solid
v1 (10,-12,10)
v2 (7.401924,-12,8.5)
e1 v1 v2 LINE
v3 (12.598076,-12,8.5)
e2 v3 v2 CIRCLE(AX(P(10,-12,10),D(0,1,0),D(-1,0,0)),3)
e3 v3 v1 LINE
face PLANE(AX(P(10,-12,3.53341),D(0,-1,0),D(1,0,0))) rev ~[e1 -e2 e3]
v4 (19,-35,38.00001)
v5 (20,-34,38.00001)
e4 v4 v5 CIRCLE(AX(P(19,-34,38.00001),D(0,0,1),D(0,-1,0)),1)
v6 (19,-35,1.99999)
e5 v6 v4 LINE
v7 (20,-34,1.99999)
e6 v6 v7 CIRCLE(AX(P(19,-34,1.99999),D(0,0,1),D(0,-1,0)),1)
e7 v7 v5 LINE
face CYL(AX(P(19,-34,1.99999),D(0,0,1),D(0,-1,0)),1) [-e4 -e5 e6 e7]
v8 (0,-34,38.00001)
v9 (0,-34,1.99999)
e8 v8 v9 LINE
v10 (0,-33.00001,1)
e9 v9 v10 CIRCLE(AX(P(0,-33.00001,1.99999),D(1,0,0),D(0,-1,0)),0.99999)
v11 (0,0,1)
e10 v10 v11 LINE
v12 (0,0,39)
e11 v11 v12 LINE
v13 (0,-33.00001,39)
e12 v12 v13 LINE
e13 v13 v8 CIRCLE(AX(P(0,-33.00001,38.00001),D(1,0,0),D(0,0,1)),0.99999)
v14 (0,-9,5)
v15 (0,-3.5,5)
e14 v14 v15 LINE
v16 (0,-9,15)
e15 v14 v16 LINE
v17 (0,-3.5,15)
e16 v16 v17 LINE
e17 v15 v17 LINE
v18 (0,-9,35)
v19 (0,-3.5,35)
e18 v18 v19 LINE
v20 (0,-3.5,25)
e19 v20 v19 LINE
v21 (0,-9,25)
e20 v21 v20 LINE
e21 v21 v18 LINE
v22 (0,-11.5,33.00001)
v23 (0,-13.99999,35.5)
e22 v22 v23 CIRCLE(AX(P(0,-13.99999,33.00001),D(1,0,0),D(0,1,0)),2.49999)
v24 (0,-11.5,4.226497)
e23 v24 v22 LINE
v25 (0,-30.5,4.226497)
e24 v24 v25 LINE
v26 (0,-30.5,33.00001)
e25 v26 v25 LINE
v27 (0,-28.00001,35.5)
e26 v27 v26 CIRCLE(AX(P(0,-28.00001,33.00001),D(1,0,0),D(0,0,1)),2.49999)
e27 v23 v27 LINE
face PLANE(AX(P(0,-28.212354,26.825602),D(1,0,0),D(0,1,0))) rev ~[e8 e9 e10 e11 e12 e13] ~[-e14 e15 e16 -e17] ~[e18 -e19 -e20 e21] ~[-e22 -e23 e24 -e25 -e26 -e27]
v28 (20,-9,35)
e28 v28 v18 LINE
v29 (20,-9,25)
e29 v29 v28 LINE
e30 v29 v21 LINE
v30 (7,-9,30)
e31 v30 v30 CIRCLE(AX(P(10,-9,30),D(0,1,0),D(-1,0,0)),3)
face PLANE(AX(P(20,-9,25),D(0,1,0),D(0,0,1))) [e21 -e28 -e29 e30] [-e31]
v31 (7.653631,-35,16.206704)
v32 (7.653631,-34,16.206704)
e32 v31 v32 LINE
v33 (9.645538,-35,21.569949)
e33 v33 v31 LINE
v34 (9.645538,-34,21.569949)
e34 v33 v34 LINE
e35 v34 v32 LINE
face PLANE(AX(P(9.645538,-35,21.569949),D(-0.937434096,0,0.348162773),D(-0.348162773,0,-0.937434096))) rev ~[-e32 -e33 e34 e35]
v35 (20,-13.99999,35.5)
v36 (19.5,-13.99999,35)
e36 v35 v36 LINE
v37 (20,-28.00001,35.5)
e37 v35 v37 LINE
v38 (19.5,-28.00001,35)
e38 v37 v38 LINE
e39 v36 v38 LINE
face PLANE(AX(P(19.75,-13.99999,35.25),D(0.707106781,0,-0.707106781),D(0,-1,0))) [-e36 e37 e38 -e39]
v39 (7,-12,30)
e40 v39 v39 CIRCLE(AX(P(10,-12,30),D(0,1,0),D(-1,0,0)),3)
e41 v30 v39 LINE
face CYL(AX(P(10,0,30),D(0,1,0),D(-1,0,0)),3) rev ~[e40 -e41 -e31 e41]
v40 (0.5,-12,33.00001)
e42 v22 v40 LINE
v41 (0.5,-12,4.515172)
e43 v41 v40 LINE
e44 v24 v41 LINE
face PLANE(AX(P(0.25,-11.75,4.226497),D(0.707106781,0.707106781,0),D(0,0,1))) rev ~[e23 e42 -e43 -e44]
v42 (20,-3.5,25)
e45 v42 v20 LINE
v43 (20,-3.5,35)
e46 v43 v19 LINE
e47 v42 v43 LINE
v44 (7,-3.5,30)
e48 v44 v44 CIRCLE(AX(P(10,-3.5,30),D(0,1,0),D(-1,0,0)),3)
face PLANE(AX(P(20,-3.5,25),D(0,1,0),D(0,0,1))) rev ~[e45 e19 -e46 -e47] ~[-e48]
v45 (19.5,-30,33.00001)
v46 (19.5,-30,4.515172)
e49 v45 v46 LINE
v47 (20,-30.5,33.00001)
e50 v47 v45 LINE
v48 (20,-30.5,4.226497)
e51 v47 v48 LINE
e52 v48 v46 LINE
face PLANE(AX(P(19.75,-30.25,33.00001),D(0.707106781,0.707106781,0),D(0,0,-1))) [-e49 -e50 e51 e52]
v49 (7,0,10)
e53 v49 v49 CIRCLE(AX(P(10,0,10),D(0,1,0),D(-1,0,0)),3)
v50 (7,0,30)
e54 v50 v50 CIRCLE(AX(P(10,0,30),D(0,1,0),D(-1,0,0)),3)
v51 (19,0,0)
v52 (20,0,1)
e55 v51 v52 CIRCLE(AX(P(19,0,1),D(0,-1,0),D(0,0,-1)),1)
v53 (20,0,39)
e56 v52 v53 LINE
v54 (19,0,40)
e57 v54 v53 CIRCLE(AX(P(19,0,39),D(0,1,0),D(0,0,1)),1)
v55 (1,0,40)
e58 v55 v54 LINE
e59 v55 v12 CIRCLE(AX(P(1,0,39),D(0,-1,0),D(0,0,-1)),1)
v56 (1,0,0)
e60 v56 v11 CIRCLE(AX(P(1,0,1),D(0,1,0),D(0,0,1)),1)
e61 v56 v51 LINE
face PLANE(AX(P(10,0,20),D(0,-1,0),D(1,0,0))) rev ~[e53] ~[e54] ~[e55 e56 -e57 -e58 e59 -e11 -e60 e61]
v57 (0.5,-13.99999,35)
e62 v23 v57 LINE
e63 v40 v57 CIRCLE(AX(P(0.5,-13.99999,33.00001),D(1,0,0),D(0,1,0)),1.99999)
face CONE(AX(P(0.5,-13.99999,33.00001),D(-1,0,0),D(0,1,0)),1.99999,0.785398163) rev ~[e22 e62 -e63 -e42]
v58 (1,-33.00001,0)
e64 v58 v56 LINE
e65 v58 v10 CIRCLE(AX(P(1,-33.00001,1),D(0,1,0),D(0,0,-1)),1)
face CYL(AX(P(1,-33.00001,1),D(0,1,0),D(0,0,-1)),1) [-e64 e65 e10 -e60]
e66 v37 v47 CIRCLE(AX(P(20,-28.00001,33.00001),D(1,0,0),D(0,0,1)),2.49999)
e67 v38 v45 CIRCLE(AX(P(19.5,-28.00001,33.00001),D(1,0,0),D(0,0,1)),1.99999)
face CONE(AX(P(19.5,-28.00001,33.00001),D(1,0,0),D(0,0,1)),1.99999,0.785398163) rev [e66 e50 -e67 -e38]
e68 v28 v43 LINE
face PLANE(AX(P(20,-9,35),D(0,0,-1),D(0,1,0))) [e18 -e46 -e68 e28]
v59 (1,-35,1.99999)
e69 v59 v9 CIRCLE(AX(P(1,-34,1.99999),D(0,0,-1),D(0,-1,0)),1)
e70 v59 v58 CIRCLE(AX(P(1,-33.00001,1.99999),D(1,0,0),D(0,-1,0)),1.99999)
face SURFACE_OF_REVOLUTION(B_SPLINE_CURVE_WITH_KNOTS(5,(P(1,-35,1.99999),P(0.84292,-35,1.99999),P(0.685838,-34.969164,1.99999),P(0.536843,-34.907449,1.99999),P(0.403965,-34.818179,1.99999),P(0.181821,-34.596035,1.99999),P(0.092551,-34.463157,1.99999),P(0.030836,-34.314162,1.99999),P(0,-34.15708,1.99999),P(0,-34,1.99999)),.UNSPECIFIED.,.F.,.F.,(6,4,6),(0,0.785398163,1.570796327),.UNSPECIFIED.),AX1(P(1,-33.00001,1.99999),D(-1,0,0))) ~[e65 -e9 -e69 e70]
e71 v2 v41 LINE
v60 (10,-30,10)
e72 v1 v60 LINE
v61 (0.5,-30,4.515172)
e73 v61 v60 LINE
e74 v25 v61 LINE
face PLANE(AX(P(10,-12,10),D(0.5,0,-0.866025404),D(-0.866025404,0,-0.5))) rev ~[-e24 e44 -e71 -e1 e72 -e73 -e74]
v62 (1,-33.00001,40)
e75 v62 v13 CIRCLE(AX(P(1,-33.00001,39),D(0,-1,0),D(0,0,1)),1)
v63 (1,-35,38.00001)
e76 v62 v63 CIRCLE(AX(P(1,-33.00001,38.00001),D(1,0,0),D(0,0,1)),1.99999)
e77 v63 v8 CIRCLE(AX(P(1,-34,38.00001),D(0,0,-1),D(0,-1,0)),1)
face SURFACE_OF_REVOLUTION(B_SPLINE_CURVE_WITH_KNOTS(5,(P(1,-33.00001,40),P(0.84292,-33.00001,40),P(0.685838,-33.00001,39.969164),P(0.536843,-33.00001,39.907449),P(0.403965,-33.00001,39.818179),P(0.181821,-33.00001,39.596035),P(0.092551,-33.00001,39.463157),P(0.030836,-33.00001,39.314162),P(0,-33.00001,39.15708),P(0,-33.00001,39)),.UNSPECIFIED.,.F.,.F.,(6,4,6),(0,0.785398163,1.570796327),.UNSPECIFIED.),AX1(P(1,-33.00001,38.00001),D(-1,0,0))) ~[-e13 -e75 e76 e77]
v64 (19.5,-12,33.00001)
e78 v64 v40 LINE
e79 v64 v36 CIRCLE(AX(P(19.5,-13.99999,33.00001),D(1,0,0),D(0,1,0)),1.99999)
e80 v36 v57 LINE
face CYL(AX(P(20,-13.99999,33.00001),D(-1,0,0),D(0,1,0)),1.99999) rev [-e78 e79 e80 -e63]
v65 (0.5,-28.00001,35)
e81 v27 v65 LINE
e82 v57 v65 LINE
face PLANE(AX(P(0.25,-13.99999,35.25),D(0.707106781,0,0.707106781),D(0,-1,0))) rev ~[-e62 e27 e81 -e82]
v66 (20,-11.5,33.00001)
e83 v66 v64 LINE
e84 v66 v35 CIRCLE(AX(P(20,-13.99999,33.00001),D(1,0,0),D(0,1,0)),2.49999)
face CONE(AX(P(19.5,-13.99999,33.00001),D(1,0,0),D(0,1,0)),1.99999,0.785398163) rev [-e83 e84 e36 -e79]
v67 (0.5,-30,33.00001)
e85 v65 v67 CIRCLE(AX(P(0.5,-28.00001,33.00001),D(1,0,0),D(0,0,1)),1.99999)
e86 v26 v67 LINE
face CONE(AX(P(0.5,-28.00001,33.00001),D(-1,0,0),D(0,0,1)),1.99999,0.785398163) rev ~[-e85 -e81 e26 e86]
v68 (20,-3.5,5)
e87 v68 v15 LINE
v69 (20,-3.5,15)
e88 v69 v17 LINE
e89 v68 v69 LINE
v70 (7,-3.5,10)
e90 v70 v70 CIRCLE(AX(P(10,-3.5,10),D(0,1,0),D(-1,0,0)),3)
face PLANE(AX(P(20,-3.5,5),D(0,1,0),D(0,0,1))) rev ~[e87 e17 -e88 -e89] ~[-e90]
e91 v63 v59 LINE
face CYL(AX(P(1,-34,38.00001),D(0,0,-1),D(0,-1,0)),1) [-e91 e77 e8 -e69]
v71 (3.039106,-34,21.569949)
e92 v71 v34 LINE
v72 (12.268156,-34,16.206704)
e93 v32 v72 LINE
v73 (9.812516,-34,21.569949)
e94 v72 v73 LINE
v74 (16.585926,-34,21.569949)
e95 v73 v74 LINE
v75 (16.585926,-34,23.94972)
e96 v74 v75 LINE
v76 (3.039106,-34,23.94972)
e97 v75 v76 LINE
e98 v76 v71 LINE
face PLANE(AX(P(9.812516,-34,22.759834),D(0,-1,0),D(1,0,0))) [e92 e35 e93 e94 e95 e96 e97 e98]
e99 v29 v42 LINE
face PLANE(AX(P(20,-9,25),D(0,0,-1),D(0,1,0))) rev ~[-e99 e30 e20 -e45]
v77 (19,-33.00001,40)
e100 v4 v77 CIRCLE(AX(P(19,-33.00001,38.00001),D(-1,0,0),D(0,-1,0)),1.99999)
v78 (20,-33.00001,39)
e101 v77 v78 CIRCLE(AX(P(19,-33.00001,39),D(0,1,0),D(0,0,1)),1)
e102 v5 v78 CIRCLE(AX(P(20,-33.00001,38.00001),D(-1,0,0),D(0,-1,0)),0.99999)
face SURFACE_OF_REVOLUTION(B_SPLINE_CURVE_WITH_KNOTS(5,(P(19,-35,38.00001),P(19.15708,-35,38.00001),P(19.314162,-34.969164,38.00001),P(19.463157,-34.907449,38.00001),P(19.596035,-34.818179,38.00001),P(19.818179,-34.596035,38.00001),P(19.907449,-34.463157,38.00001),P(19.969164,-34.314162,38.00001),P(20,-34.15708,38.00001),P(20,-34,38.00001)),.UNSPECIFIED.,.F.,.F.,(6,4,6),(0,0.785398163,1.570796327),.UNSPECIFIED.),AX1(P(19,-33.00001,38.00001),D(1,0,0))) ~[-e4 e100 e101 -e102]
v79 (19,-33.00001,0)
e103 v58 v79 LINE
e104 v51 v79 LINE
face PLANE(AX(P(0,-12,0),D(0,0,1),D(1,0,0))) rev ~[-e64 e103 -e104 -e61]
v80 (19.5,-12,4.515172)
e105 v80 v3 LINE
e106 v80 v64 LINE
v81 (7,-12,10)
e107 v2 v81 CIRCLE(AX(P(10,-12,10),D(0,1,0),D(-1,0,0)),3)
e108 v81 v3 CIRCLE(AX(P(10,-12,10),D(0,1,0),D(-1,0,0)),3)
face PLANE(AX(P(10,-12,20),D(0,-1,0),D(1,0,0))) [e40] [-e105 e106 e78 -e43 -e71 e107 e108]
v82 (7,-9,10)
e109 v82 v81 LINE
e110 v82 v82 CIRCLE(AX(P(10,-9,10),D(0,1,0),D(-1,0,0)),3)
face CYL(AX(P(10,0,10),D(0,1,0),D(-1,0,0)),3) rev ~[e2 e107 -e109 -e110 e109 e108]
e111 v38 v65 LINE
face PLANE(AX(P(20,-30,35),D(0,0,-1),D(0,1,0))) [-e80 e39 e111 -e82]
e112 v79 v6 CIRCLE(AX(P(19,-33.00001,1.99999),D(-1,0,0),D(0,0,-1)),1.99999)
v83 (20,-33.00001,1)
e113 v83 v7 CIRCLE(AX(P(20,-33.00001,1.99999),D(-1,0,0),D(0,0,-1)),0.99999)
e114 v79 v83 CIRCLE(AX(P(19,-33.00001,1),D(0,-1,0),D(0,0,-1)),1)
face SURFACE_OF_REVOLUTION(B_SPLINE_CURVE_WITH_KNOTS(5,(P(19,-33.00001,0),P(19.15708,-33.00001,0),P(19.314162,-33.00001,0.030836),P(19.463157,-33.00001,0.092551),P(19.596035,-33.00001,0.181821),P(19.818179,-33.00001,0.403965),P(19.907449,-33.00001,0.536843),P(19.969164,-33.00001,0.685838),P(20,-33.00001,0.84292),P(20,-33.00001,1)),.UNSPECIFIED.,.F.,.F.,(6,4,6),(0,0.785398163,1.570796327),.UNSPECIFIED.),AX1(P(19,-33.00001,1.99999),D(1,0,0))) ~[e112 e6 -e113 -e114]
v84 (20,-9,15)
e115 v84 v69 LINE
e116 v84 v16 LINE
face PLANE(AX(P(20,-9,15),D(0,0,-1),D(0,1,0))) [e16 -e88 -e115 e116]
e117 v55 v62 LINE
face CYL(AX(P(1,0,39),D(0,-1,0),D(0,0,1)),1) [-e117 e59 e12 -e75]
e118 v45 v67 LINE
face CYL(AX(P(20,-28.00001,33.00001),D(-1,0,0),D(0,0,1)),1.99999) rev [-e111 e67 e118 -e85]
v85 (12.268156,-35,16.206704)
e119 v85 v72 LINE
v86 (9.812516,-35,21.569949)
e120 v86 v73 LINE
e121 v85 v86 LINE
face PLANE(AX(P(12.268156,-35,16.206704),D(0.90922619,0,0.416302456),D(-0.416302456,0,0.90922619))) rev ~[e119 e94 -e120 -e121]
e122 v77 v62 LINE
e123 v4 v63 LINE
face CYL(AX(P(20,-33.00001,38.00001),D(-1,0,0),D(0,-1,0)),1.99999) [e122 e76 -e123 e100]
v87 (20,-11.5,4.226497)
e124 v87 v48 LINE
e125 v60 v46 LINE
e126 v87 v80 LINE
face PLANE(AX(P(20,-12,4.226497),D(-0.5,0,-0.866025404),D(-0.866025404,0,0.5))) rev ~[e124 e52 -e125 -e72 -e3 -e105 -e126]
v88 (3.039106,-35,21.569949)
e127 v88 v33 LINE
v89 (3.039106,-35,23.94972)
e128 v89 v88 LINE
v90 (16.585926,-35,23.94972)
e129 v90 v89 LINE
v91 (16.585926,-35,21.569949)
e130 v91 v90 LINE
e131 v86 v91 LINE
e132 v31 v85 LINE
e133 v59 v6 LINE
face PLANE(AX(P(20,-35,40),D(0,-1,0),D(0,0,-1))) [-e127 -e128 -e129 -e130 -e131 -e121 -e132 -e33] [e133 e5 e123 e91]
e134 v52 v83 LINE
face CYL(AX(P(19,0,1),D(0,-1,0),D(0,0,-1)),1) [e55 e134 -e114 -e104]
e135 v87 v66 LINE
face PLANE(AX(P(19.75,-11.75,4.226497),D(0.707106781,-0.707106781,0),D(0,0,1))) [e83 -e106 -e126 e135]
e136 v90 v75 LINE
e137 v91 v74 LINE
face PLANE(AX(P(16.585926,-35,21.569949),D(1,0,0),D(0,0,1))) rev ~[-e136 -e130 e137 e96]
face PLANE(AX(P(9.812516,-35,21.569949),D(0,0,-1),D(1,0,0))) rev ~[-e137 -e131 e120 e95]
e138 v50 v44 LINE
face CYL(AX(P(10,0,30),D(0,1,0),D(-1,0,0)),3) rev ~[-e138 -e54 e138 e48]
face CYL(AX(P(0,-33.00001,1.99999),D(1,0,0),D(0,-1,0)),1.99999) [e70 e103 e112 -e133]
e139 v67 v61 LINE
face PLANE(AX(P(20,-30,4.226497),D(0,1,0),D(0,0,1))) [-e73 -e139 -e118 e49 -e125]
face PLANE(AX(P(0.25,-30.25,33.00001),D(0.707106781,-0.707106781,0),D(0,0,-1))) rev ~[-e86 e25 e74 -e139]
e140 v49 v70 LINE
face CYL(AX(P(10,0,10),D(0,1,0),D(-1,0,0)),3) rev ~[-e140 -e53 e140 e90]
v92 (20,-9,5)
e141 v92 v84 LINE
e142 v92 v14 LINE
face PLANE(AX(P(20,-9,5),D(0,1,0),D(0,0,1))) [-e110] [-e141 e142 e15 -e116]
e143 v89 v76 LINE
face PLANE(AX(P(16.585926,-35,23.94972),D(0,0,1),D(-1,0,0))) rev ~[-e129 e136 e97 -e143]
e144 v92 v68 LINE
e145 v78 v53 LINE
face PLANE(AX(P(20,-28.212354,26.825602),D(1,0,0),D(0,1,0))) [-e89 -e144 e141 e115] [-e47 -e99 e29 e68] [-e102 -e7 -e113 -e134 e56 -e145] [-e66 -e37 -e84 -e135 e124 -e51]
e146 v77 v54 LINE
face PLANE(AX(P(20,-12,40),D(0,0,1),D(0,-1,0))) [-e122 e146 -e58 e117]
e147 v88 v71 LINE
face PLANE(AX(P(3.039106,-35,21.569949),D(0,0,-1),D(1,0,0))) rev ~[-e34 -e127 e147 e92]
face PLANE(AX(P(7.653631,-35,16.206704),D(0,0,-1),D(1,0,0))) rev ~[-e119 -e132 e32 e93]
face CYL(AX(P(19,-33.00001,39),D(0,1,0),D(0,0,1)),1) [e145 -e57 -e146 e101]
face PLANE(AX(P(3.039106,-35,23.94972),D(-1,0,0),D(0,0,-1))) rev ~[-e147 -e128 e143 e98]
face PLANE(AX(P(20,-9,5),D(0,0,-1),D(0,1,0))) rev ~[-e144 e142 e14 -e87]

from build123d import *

# Parameters (mm, degrees)
F0_W      = 20
F0_H      = 40
F1_DEPTH  = 12
F2_R      = 3
F3_DEPTH  = 12
F5_DEPTH  = 23
F7_DEPTH  = 20
F8_R      = 1.99999
F9_R      = 1
F10_W     = 5.5
F10_H     = 10
F11_DEPTH = 25
F13_DEPTH = 1
F14_SIZE  = 0.5


# Not quite as in the source:
# - a fillet or chamfer is up to 0.001 mm smaller than in the source, because OpenCascade refuses the exact size


with BuildPart() as f1:
    # F0 (on Front) → F1 (new body)
    with BuildSketch(Plane.XZ):
        with Locations((10, 20)):
            Rectangle(F0_W, F0_H)
    extrude(amount=F1_DEPTH)

    # F2 (on face) → F3 (cut, through all)
    with BuildSketch(Plane(origin=(0, 0, 0), x_dir=(-1, 0, 0), z_dir=(0, 1, 0))):
        with Locations((-10, 30)):
            Circle(F2_R)
        with Locations((-10, 10)):
            Circle(F2_R)
    extrude(amount=-F3_DEPTH, mode=Mode.SUBTRACT)

    # F4 (on face) → F5 (join)
    with BuildSketch(Plane.XZ.offset(12)):
        Polygon((0, 4.2264973081), (0, 0), (20, 0), (20, 4.2264973081), (10, 10), align=None)
    extrude(amount=F5_DEPTH)

    # F6 (on face) → F7 (join, through all)
    with BuildSketch(Plane.YZ.offset(20)):
        Polygon((-35, 40), (-35, 4.2264973081), (-30, 4.2264973081), (-30, 35), (-12, 35), (-12, 40), align=None)
    extrude(amount=-F7_DEPTH)

    # F8 (radius 2 in the source; OpenCascade refuses exactly that, so slightly less here)
    f8_edges = [f1.edges().sort_by_distance(p)[0] for p in [
        (10, -35, 40),
        (10, -35, 0),
        (10, -30, 35),
        (10, -12, 35),
    ]]
    fillet(f8_edges, radius=F8_R)

    # F9
    f9_edges = [f1.edges().sort_by_distance(p)[0] for p in [
        (20, -35, 20),
        (0, -35, 20),
    ]]
    fillet(f9_edges, radius=F9_R)

    # F10 (on face) → F11 (cut)
    with BuildSketch(Plane.YZ.offset(20)):
        with Locations((-6.25, 30)):
            Rectangle(F10_W, F10_H)
        with Locations((-6.25, 10)):
            Rectangle(F10_W, F10_H)
    extrude(amount=-F11_DEPTH, mode=Mode.SUBTRACT)

    # F12 (on face) → F13 (cut)
    with BuildSketch(Plane.XZ.offset(35)):
        Polygon((16.5859262925, 23.9497199655), (3.0391060282, 23.9497199655), (3.0391060282, 21.5699486434), (9.6455384046, 21.5699486434), (9.8125161603, 21.5699486434), (16.5859262925, 21.5699486434), align=None)
        Polygon((9.8125161603, 21.5699486434), (9.6455384046, 21.5699486434), (7.6536308043, 16.2067040801), (12.2681558132, 16.2067040801), align=None)
    extrude(amount=-F13_DEPTH, mode=Mode.SUBTRACT)

    # F14
    f14_edges = [f1.edges().sort_by_distance(p)[0] for p in [
        (20, -12, 18.613254),
        (0, -12, 18.613254),
    ]]
    chamfer(f14_edges, length=F14_SIZE)


solid = f1.part
